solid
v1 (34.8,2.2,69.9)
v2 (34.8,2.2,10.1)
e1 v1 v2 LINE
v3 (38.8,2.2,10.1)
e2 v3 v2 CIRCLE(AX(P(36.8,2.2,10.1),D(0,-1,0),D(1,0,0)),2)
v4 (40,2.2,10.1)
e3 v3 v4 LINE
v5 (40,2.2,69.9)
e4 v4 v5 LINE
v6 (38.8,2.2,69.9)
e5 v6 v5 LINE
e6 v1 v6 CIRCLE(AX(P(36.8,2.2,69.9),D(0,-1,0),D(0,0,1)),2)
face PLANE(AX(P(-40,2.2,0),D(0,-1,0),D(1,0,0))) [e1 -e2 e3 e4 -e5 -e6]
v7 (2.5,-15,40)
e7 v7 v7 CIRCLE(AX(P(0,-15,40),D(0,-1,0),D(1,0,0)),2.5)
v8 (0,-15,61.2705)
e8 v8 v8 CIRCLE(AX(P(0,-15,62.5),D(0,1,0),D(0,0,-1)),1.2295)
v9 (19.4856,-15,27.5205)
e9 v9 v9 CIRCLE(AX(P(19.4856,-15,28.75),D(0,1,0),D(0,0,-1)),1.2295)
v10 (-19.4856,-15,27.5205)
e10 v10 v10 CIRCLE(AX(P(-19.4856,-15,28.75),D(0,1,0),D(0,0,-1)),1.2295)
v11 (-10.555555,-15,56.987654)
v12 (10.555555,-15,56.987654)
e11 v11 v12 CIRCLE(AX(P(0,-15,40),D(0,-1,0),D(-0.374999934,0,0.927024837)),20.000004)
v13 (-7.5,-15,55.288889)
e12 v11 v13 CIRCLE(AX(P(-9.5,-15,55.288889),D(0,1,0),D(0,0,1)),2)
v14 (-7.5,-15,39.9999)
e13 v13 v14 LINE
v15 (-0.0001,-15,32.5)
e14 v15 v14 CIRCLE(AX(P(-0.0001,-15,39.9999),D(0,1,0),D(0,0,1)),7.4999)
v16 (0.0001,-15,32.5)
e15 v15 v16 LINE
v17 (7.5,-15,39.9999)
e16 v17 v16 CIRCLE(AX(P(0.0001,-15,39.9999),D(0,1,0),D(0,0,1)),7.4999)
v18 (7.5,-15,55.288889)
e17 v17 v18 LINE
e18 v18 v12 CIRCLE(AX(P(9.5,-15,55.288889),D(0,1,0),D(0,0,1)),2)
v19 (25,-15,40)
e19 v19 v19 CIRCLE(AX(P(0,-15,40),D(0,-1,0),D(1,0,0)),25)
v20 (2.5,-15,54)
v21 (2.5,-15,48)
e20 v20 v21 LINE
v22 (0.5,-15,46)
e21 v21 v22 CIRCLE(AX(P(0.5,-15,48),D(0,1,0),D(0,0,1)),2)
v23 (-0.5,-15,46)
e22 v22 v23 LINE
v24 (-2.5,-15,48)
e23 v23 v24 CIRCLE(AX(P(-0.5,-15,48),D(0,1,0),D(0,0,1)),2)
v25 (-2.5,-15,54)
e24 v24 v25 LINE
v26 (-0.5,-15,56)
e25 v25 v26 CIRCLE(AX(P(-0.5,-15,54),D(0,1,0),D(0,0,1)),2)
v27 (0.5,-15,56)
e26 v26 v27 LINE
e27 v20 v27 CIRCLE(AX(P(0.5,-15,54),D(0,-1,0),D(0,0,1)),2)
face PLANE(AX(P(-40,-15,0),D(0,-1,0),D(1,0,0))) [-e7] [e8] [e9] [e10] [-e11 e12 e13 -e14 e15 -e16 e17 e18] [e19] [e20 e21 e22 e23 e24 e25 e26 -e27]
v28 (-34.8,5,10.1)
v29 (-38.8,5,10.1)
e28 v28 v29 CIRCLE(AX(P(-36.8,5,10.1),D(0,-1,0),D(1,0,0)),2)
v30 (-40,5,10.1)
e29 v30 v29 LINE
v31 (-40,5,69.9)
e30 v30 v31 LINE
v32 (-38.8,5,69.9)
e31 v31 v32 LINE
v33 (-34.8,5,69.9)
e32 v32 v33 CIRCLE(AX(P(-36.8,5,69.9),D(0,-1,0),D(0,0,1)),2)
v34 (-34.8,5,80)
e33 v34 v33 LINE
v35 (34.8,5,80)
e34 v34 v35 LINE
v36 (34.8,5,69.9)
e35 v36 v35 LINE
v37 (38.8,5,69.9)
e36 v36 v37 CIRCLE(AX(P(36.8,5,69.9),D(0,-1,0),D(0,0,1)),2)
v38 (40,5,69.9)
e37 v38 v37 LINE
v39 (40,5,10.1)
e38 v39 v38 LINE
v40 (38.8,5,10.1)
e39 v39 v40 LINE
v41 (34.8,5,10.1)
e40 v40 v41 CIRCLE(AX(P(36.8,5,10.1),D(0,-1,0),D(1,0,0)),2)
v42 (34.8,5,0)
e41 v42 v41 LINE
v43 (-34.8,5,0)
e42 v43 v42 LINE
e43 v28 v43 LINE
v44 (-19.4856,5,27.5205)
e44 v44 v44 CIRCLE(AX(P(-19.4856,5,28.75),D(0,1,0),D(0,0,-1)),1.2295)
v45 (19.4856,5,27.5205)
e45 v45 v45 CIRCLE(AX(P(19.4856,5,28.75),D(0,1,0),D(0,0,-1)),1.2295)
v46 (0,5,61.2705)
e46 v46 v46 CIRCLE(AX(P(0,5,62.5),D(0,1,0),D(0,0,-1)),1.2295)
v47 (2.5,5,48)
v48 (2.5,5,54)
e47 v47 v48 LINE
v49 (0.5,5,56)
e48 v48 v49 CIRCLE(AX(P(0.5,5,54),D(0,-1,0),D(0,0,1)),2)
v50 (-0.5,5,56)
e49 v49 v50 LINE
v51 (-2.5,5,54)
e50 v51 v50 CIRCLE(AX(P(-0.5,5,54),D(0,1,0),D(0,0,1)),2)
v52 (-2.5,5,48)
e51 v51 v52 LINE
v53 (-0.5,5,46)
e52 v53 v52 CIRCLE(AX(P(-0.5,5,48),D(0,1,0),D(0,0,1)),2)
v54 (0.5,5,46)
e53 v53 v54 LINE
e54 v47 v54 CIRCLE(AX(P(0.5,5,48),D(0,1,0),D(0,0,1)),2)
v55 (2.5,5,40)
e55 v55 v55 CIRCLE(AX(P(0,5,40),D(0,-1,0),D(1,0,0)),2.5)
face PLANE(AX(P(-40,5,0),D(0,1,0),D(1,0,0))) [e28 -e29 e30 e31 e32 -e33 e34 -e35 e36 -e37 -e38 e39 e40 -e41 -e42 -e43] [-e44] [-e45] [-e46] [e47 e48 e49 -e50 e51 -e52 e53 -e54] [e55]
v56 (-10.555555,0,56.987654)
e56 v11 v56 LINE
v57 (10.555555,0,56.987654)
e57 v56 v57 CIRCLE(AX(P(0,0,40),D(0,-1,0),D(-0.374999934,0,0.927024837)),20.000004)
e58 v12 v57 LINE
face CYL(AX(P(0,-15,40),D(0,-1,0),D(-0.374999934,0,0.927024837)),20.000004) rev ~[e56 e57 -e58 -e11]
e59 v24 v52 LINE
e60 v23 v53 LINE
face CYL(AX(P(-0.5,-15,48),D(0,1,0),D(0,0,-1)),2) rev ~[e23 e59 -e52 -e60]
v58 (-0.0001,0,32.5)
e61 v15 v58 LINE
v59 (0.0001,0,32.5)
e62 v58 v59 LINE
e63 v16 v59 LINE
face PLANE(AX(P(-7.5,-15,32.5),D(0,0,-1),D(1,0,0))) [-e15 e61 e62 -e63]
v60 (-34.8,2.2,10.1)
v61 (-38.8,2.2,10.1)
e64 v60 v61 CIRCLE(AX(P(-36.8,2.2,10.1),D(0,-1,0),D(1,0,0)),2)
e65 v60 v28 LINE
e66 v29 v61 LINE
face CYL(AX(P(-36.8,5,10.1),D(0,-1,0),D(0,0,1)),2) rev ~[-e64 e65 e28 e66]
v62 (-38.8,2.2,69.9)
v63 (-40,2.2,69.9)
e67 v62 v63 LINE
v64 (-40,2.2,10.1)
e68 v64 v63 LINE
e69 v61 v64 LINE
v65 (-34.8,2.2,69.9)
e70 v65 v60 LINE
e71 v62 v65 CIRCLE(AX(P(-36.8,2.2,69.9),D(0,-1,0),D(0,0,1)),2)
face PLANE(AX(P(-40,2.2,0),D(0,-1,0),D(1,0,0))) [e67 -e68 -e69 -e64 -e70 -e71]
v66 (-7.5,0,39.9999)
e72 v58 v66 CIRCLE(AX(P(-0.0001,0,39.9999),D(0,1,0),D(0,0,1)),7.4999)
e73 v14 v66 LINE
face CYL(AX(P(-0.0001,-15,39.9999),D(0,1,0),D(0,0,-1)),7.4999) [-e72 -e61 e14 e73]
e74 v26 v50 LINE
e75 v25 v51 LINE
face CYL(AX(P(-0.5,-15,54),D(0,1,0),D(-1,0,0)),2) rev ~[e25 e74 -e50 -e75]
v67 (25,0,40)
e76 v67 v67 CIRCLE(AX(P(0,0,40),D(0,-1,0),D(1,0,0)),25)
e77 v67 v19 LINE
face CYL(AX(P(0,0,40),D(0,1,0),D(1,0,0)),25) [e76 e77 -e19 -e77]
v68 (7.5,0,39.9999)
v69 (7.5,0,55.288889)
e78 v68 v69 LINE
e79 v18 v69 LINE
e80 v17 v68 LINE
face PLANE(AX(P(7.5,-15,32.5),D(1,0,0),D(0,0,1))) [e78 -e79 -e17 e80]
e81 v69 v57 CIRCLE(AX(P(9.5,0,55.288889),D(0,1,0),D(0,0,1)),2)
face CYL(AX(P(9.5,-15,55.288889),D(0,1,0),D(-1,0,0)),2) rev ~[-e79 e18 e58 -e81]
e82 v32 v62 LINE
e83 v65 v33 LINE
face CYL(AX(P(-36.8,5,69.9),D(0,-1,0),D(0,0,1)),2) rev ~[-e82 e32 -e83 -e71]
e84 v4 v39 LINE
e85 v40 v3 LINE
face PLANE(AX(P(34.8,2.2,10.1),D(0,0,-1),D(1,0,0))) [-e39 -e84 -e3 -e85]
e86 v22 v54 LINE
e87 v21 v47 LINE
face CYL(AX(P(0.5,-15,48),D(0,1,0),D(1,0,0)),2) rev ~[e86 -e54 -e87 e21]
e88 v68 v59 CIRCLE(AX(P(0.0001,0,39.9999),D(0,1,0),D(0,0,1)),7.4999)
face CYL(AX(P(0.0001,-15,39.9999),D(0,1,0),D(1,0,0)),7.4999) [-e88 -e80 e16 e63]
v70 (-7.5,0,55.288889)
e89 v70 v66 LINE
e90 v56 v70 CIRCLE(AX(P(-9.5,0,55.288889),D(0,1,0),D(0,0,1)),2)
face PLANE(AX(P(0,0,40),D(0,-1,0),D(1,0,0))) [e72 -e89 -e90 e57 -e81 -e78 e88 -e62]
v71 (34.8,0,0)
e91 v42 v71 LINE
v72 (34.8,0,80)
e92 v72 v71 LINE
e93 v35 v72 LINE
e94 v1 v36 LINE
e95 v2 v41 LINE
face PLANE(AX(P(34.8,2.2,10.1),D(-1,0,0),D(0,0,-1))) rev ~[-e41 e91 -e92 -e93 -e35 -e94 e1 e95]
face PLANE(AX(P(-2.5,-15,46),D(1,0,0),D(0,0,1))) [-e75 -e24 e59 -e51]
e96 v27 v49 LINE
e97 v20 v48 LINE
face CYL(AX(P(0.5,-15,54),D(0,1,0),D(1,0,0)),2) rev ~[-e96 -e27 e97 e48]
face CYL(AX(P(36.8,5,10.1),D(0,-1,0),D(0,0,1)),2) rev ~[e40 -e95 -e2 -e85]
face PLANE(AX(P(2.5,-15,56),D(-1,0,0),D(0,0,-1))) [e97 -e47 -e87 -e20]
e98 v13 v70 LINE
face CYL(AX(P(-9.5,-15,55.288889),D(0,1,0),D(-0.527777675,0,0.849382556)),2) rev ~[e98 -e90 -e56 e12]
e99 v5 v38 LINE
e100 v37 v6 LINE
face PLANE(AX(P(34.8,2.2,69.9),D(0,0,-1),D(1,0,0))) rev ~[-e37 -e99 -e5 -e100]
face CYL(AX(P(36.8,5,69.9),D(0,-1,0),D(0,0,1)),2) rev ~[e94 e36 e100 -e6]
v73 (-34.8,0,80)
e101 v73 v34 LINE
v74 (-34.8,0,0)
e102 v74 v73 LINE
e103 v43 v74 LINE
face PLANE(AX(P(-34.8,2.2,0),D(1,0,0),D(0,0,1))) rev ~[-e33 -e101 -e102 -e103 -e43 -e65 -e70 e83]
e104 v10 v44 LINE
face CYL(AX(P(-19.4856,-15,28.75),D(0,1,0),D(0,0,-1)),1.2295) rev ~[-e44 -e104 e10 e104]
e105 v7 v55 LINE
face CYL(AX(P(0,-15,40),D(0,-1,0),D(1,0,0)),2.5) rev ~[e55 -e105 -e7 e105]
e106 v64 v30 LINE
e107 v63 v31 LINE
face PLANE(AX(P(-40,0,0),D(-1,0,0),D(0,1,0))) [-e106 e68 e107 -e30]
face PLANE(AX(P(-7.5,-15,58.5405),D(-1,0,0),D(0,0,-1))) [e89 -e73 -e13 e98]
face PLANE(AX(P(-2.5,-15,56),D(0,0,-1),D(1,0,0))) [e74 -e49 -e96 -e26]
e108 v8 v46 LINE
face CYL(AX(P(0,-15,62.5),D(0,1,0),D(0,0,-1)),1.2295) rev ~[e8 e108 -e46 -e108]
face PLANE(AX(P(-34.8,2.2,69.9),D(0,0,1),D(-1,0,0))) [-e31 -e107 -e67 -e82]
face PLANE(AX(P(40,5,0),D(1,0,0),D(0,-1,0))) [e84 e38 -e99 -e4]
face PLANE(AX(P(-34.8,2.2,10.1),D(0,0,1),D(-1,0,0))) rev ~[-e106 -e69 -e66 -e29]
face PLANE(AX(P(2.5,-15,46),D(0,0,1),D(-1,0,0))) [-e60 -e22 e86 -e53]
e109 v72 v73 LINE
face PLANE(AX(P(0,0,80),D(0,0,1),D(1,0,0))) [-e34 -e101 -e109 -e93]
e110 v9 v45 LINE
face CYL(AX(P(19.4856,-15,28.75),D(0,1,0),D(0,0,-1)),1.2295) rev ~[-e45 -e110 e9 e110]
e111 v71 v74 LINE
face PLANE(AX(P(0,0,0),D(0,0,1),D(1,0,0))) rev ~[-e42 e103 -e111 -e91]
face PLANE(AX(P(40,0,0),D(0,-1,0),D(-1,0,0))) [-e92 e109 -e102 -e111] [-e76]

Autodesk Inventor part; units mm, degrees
ref_plane "YZ Plane" through (0, 0, 0) normal (1, 0, 0) x (0, 1, 0)
ref_plane "XZ Plane" through (0, 0, 0) normal (0, 1, 0) x (-1, 0, 0)
ref_plane "XY Plane" through (0, 0, 0) normal (0, 0, 1) x (1, 0, 0)
sketch "スケッチ1" plane through (0, 0, 0) normal (0, 0, 1) x (1, 0, 0)
  line L0 (-40, 5) -> (40, 5)
  line L1 (40, 5) -> (40, 0)
  line L2 (40, 0) -> (-40, 0)
  line L3 (-40, 0) -> (-40, 5)
  point P0 (0, 0)
  dimension "d5" = 40
  dimension "d6" = 80
  dimension "d7" = 5
  dimension "d8" = 0
extrude "押し出し1" add sketch "スケッチ1" along normal blind 80
sketch "スケッチ5" plane through (-40, 0, 0) normal (0, -1, 0) x (1, 0, 0)
  circle A0 centre (40, 40) radius 25
  point P0 (40, 0)
  dimension "d19" = 50
extrude "押し出し4" add sketch "スケッチ5" along normal blind 15
sketch "スケッチ6" plane through (0, -15, 40) normal (0, -1, 0) x (1, 0, 0)
  circle A0 centre (0, 0) radius 25 projected
  circle A1 centre (0, 0) radius 2.5
  point P0 (0, -40)
  dimension "d22" = 5
extrude "押し出し5" cut sketch "スケッチ6" against normal blind 20 contours A1
sketch "スケッチ10" plane through (-40, 0, 0) normal (0, -1, 0) x (1, 0, 0)
  line L0 (80, 0) -> (0, 0) projected
  line L1 (80, 0) -> (80, 80) projected
  line L2 (0, 80) -> (5.2, 80)
  line L3 (5.2, 80) -> (5.2, 0)
  line L4 (5.2, 0) -> (0, 0)
  line L5 (0, 0) -> (0, 80)
  line L6 (80, 80) -> (74.8, 80)
  line L7 (74.8, 80) -> (74.8, 0)
  line L8 (74.8, 0) -> (80, 0)
  line L9 (80, 0) -> (80, 80)
  point P0 (40, 0)
  dimension "d70" = 5.2
  dimension "d71" = 5.2
extrude "押し出し9" cut sketch "スケッチ10" against normal blind 2.2
sketch "スケッチ11" plane through (-40, 2.2, 0) normal (0, -1, 0) x (1, 0, 0)
  line L0 (5.2, 0) -> (5.2, 80) projected
  line L1 (0, 80) -> (5.2, 80)
  line L2 (5.2, 80) -> (5.2, 69.9)
  line L3 (5.2, 69.9) -> (0, 69.9)
  line L4 (0, 69.9) -> (0, 80)
  line L5 (0, 0) -> (5.2, 0)
  line L6 (5.2, 0) -> (5.2, 10.1)
  line L7 (5.2, 10.1) -> (0, 10.1)
  line L8 (0, 10.1) -> (0, 0)
  point P0 (40, 0)
  dimension "d76" = 10.1
  dimension "d77" = 10.1
extrude "押し出し10" cut sketch "スケッチ11" against normal through all
sketch "スケッチ12" plane through (-40, 2.2, 0) normal (0, -1, 0) x (1, 0, 0)
  line L0 (74.8, 80) -> (74.8, 0) projected
  line L1 (74.8, 80) -> (80, 80) projected
  line L2 (80, 80) -> (74.8, 80)
  line L3 (74.8, 80) -> (74.8, 69.9)
  line L4 (74.8, 69.9) -> (80, 69.9)
  line L5 (80, 69.9) -> (80, 80)
  line L6 (80, 0) -> (74.8, 0)
  line L7 (74.8, 0) -> (74.8, 10.1)
  line L8 (74.8, 10.1) -> (80, 10.1)
  line L9 (80, 10.1) -> (80, 0)
  point P0 (40, 0)
  dimension "d80" = 10.1
  dimension "d81" = 10.1
extrude "押し出し11" cut sketch "スケッチ12" against normal through all
sketch "スケッチ13" plane through (-34.8, 5, 0) normal (0, 1, 0) x (1, 0, 0)
  line L0 (74.8, -10.1) -> (69.6, -10.1) projected
  line L1 (0, 0) -> (0, -10.1) projected
  line L2 (0, -10.1) -> (-5.2, -10.1) projected
  line L3 (-5.2, -69.9) -> (0, -69.9) projected
  line L4 (69.6, -80) -> (69.6, -69.9) projected
  line L5 (69.6, -69.9) -> (74.8, -69.9) projected
  point P0 (34.8, 0)
  point P1 (-2, -10.1)
  point P2 (-2, -69.9)
  point P3 (71.6, -69.9)
  point P4 (71.6, -10.1)
  dimension "d84" = 2
  dimension "d85" = 2
  dimension "d86" = 2
  dimension "d87" = 2
hole "Hole2" at (-36.8, 5, 10.1) at (-36.8, 5, 69.9) at (36.8, 5, 69.9) at (36.8, 5, 10.1) direction (0, -1, 0) diameter 4 end through all
sketch "スケッチ14" plane through (0, -15, 40) normal (0, -1, 0) x (1, 0, 0)
  circle A0 centre (0, 0) radius 2.5 projected
  line L0 (-2.5, 16) -> (2.5, 16)
  line L1 (2.5, 16) -> (2.5, 6)
  line L2 (2.5, 6) -> (-2.5, 6)
  line L3 (-2.5, 6) -> (-2.5, 16)
  point P0 (0, -40)
  dimension "d95" = 5
  dimension "d96" = 6
  dimension "d97" = 10
extrude "押し出し12" cut sketch "スケッチ14" against normal through all contours L0 L1 L2 L3
fillet "フィレット6" radius 2 4 edges at (-2.5, -5, 56) (2.5, -5, 56) (2.5, -5, 46) (-2.5, -5, 46)
sketch "スケッチ16" plane through (0, -15, 40) normal (0, -1, 0) x (1, 0, 0)
  line L0 (-2.5, 8) -> (-2.5, 14) projected
  line L1 (2.5, 14) -> (2.5, 8) projected
  line L2 (0.5, 6) -> (-0.5, 6) projected
  circle A0 centre (0, 0) radius 2.5 projected
  circle A1 centre (0, 0) radius 25 projected
  arc A2 (-7.5, 18.5405) -> (7.5, 18.5405) centre (0, 0) ccw
  line L3 (-7.5, 18.5405) -> (-7.5, -7.5)
  line L4 (-7.5, -7.5) -> (7.5, -7.5)
  line L5 (7.5, -7.5) -> (7.5, 18.5405)
  arc A3 (7.5, 18.5405) -> (-7.5, 18.5405) centre (0, 0) ccw
  point P0 (0, -40)
  dimension "d104" = 40
  dimension "d105" = 5
  dimension "d106" = 5
  dimension "d107" = 7.5
extrude "押し出し14" cut sketch "スケッチ16" against normal up to surface (15 mm away) contours L3 L4 L5 A2
fillet "フィレット7" radius 7.5 2 edges at (7.5, -7.5, 32.5) (-7.5, -7.5, 32.5)
fillet "フィレット8" radius 2 2 edges at (7.5, -7.5, 58.5405) (-7.5, -7.5, 58.5405)
sketch "スケッチ17" plane through (0, -15, 40) normal (0, -1, 0) x (1, 0, 0)
  line L0 (0.5, 6) -> (-0.5, 6) projected
  circle A0 centre (0, 0) radius 2.5 projected
  circle A1 centre (0, 0) radius 22.5
  line L1 (0, 0) -> (0, 22.5)
  line L2 (0, 0) -> (19.4856, -11.25)
  line L3 (0, 0) -> (-19.4856, -11.25)
  point P0 (0, -40)
  point P1 (19.4856, -11.25)
  dimension "d112" = 45
  dimension "d113" = 120
  dimension "d114" = 120
hole "Hole3" at (0, -15, 62.5) at (19.4856, -15, 28.75) at (-19.4856, -15, 28.75) direction (0, 1, 0) diameter 2.459 end through all thread size "M3x0.5" class "6H" standard "ISO Metric profile"
equation "\"d5\" = 0.5 * d6"
equation "\"d9\" = d6"
equation "\"d77\" = d76"
equation "\"d81\" = d80"
equation "\"d85\" = d84"
equation "\"d86\" = d84"
equation "\"d87\" = d84"
properties part number "JointB0" material "ポリエチレン、低密度"
